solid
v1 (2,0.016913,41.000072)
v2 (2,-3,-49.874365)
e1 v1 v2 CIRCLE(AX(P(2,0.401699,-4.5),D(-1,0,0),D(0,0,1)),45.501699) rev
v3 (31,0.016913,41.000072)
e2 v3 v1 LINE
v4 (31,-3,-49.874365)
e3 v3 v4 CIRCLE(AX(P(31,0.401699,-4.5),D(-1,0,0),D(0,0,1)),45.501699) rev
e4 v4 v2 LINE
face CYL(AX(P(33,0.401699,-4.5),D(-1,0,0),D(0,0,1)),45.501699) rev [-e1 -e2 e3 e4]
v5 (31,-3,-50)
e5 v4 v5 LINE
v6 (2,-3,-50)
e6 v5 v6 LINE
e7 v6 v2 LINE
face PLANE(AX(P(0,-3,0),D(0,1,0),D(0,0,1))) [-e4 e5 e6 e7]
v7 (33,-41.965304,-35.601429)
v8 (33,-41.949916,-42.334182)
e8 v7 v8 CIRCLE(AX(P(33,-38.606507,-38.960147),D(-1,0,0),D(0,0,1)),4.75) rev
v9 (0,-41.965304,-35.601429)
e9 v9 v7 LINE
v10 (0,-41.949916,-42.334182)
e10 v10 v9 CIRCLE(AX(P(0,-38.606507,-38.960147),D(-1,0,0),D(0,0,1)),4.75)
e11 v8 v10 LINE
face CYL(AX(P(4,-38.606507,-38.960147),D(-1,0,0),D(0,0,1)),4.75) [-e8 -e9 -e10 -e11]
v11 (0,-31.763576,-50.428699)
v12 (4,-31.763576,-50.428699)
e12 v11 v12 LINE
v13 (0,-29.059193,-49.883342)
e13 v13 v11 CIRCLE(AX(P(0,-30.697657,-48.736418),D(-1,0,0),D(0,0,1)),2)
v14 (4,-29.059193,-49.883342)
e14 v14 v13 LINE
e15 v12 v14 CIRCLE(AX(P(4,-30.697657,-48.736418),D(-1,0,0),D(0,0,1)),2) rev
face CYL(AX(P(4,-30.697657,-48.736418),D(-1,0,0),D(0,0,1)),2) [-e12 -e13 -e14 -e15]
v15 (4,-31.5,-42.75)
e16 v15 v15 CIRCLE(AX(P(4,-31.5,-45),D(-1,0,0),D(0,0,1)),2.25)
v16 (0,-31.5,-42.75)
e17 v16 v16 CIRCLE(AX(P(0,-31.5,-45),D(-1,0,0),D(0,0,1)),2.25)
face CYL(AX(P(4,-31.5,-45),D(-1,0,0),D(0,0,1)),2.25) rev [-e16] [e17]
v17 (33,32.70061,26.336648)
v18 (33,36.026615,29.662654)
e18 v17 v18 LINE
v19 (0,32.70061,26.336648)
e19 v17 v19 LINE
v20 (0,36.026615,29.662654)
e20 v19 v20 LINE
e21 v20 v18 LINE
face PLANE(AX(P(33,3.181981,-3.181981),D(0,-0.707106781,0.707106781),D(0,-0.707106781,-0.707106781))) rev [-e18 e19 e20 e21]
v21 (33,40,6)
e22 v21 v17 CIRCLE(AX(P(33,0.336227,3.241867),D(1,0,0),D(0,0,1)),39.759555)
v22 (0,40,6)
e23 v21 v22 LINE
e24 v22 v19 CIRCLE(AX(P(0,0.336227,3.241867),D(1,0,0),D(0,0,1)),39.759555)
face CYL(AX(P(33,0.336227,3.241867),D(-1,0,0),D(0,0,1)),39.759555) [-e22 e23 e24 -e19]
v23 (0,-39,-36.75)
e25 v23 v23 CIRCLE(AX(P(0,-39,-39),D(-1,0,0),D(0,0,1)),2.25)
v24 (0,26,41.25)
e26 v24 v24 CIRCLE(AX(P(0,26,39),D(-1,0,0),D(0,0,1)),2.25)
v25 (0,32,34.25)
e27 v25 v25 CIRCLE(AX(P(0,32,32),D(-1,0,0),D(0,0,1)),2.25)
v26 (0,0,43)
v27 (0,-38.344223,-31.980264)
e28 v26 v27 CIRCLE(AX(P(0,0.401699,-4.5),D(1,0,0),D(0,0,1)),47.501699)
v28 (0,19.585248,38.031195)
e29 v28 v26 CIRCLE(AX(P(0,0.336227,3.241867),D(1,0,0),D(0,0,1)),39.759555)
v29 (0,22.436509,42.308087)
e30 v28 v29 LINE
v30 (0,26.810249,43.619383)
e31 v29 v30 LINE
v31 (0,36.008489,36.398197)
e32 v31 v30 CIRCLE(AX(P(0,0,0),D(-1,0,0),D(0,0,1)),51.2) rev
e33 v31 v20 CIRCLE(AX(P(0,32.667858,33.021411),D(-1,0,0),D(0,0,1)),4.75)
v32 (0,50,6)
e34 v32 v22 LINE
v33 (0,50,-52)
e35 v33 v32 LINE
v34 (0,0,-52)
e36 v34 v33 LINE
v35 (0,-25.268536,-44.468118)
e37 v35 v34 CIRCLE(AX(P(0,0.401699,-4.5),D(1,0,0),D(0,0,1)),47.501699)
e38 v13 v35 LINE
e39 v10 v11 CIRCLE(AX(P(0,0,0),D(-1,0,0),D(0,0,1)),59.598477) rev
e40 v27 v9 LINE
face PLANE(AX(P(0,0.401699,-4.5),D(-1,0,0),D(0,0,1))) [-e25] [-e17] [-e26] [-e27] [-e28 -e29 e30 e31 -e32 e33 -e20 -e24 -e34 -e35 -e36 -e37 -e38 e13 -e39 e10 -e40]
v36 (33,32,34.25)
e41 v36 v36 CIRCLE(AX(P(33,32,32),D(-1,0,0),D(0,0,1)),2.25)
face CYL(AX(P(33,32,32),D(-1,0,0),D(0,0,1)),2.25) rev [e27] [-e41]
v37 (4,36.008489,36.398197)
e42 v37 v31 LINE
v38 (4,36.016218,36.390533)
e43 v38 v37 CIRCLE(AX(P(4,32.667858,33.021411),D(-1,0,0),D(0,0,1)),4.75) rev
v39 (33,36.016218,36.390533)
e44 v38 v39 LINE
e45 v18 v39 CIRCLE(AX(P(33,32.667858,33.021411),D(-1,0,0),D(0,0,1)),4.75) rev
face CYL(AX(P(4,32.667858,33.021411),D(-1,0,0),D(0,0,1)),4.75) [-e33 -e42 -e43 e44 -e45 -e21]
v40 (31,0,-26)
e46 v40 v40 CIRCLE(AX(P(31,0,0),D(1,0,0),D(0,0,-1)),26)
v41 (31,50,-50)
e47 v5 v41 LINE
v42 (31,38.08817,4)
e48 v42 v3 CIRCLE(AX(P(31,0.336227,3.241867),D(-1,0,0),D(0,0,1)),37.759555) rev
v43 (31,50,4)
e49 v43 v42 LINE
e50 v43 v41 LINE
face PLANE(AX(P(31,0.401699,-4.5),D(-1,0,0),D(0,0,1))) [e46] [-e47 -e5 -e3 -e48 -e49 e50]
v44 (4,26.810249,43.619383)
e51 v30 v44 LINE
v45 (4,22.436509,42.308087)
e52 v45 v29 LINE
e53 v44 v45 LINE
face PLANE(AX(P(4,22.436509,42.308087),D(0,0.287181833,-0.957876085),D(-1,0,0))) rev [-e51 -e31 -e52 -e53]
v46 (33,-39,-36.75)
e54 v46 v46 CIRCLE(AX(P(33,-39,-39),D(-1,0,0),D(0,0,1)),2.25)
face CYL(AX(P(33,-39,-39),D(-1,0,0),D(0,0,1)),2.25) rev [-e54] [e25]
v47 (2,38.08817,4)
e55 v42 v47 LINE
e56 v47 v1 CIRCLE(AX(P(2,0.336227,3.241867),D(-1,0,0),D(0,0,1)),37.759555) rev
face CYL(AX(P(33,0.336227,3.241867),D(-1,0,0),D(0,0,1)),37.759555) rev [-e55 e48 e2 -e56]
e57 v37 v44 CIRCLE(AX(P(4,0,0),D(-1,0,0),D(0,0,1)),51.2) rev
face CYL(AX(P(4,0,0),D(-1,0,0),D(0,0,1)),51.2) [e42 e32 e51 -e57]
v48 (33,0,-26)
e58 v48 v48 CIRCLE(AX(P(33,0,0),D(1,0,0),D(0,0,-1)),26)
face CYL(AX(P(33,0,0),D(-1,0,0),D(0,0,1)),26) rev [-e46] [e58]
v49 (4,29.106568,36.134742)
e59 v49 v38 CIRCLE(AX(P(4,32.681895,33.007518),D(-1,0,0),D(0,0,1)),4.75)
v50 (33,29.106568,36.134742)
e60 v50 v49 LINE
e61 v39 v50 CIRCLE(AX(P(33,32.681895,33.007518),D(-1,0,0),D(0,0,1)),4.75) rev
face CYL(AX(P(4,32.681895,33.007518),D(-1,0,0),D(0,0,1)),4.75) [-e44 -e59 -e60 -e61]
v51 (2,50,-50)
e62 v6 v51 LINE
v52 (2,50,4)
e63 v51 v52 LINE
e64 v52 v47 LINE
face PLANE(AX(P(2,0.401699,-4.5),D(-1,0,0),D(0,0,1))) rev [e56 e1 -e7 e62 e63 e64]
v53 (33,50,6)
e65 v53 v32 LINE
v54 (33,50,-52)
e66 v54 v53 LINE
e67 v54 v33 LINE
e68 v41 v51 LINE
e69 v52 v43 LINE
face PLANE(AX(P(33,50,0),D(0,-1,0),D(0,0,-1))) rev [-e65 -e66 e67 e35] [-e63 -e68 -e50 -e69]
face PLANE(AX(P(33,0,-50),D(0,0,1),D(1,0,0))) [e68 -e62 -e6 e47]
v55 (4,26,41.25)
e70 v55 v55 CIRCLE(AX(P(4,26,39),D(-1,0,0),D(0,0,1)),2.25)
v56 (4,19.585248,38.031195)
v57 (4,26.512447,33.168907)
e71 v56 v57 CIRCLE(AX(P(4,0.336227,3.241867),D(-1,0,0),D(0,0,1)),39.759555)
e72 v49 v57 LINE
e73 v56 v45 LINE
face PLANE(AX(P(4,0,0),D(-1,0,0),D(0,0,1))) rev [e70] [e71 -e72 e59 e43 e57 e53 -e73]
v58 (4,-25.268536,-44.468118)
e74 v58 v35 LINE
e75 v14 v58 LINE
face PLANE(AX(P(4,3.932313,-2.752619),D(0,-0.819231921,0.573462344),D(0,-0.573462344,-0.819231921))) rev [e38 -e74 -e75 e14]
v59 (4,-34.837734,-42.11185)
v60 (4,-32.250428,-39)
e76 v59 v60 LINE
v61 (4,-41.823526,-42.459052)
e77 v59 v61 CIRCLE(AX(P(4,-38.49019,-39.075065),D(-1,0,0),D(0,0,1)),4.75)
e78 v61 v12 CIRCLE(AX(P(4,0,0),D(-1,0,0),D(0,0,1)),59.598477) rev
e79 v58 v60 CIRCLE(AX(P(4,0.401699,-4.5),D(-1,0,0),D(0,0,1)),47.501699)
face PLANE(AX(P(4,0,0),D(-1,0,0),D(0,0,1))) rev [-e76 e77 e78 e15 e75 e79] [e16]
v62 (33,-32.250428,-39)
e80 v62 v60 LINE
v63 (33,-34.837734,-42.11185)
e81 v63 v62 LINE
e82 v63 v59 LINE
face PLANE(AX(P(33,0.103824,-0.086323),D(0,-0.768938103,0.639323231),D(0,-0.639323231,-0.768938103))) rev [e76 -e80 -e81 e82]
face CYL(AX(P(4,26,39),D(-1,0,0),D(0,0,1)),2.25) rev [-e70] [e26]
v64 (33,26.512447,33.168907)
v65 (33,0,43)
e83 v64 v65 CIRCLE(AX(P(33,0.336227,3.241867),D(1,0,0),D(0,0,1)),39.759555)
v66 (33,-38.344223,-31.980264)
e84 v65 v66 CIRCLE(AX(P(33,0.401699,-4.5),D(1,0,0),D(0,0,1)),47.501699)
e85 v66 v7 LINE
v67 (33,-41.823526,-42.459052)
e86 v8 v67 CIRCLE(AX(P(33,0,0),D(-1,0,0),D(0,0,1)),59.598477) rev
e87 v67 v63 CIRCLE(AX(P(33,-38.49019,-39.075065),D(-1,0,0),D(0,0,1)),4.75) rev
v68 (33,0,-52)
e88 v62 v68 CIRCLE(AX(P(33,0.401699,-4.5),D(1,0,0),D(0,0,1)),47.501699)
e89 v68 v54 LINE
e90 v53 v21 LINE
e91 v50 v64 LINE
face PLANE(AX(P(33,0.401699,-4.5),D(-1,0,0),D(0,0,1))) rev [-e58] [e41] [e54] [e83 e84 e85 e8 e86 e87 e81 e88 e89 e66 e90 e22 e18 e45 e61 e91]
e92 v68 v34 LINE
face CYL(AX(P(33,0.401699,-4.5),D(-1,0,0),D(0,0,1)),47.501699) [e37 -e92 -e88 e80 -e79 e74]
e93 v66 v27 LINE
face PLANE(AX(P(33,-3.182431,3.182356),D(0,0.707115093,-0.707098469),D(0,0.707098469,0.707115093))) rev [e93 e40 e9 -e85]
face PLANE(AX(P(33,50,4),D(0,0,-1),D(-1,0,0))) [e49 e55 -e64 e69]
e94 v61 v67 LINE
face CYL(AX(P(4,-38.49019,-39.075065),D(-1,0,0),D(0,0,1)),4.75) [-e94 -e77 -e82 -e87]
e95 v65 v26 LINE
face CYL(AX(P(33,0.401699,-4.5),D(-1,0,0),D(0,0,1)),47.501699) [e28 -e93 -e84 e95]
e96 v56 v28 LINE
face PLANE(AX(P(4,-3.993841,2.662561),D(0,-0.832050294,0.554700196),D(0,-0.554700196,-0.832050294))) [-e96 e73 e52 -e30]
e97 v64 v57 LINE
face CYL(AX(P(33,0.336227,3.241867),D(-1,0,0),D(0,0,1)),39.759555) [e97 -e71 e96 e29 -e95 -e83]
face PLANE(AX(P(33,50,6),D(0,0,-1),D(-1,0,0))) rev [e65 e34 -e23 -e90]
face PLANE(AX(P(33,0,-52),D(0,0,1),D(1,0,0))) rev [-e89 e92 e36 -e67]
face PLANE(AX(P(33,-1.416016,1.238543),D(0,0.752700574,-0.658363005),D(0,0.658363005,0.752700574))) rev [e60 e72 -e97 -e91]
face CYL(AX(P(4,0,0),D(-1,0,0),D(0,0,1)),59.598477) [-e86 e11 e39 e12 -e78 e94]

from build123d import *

# Parameters (mm, degrees)
SKETCH1_R               = 26
BOSS_EXTRUDE1_DEPTH     = 33
SHELL1_START            = 2
SHELL1_OUTLINE_R        = 28
SHELL1_DEPTH            = 29
SKETCH2_W               = 29
SKETCH2_H               = 54
CUT_EXTRUDE1_DEPTH      = 53
SKETCH3_R               = 26
BOSS_EXTRUDE2_DEPTH     = 2
SKETCH4_R               = 31.708367963
CUT_EXTRUDE2_DEPTH      = 29
SKETCH5_R               = 2.25
BOSS_EXTRUDE3_DEPTH     = 4
FILLET1_R               = 2
CHAMFER1_SIZE           = 3.326511139
BOSS_EXTRUDE4_START     = -33
BOSS_EXTRUDE4_OUTLINE_R = 2.25
BOSS_EXTRUDE4_DEPTH     = 33
FILLET2_R               = 4.75


with BuildPart() as part:
    # Sketch1 → Boss-Extrude1 (new body)
    with BuildSketch(Plane(origin=(0, 0, 0), x_dir=(0, 0, -1), z_dir=(1, 0, 0))):
        with BuildLine():
            Line((52, 0), (52, 50))
            Line((52, 50), (0, 50))
            Line((0, 50), (-6, 50))
            Line((-6, 50), (-6, 40))
            ThreePointArc((-6, 40), (-32.429333818, 27.334633781), (-43, 0))
            ThreePointArc((-43, 0), (4.5, -47.1), (52, 0))
        make_face()
        Circle(SKETCH1_R, mode=Mode.SUBTRACT)
    extrude(amount=BOSS_EXTRUDE1_DEPTH)

    # Shell1: read off the stored shape, not the designer's step
    # Shell1 outline → Shell1 (cut)
    with BuildSketch(Plane.YZ.offset(SHELL1_START)):
        with BuildLine():
            ThreePointArc((0.016913017, 41.000071514), (-45.099999808, -4.495817139), (0.0085476, -50))
            Line((0.0085476, -50), (48, -50))
            Line((48, -50), (48, 4))
            Line((48, 4), (38.088170021, 4))
            ThreePointArc((38.088170021, 4), (26.652605024, 30.320127965), (0.016913017, 41.000071514))
        make_face()
        Circle(SHELL1_OUTLINE_R, mode=Mode.SUBTRACT)
    extrude(amount=SHELL1_DEPTH, mode=Mode.SUBTRACT)

    # Sketch2 → Cut-Extrude1 (cut)
    with BuildSketch(Plane(origin=(0, 50, 0), x_dir=(1, 0, 0), z_dir=(0, 1, 0))):
        with Locations((16.5, 23)):
            Rectangle(SKETCH2_W, SKETCH2_H)
    extrude(amount=-CUT_EXTRUDE1_DEPTH, mode=Mode.SUBTRACT)

    # Sketch3 → Boss-Extrude2 (add)
    with BuildSketch(Plane.ZY):
        with Locations(Location((0, 0, 0), (0, 0, 81.150116902))):
            Circle(SKETCH3_R)
    extrude(amount=-BOSS_EXTRUDE2_DEPTH)

    # Sketch4 → Cut-Extrude2 (cut)
    with BuildSketch(Plane(origin=(31, 0, 0), x_dir=(0, 0, -1), z_dir=(1, 0, 0))):
        Circle(SKETCH4_R)
    extrude(amount=-CUT_EXTRUDE2_DEPTH, mode=Mode.SUBTRACT)

    # Sketch5 → Boss-Extrude3 (add)
    # profile 1 of 2: a face of its own
    with BuildSketch(Plane.ZY):
        with BuildLine():
            ThreePointArc((-51.418984108, -30.13414218), (-48.82497471, -34.177482297), (-45.913745602, -37.998768617))
            Line((-45.913745602, -37.998768617), (-38.477731669, -32.793558864))
            ThreePointArc((-38.477731669, -32.793558864), (-41.663875667, -29.183056126), (-44.468117742, -25.268535724))
            Line((-44.468117742, -25.268535724), (-51.418984108, -30.13414218))
        make_face()
        with Locations((-45, -31.5)):
            Circle(SKETCH5_R, mode=Mode.SUBTRACT)
    # profile 2 of 2: a face of its own
    with BuildSketch(Plane.ZY):
        with BuildLine():
            ThreePointArc((32.398527193, 27.367900169), (35.450790949, 23.647327492), (38.031195395, 19.585248223))
            Line((38.031195395, 19.585248223), (45.075911525, 24.281725643))
            ThreePointArc((45.075911525, 24.281725643), (42.60097507, 28.400650047), (39.750789641, 32.269408468))
            Line((39.750789641, 32.269408468), (32.398527193, 27.367900169))
        make_face()
        with Locations((39, 26)):
            Circle(SKETCH5_R, mode=Mode.SUBTRACT)
    extrude(amount=-BOSS_EXTRUDE3_DEPTH)

    # Fillet1
    fillet1_edges = [part.edges().sort_by_distance(p)[0] for p in [
        (2, -30.13414218, -51.418984108),
    ]]
    fillet(fillet1_edges, radius=FILLET1_R)

    # Chamfer1
    # the kernel refuses this chamfer: 3.326511139, 3 mm, written as the material it takes off along each edge
    with BuildSketch(Plane(origin=(-8.575137871, 24.281725643, 45.075911525), x_dir=(0, -0.5547001962252163, -0.8320502943378523), z_dir=(1, 0, 0))) as chamfer1_piece_1:
        with BuildLine():
            Line((CHAMFER1_SIZE, 0), (-0.190667191, 2.911795765))
            ThreePointArc((-0.190667191, 2.911795765), (-0.119044869, 1.500102705), (0, 0))
            Line((0, 0), (CHAMFER1_SIZE, 0))
        make_face()
    extrude(amount=21.150275743, mode=Mode.SUBTRACT)

    # Boss-Extrude4: read off the stored shape, not the designer's step
    # Boss-Extrude4 outline → Boss-Extrude4 (add)
    # profile 1 of 2: a face of its own
    with BuildSketch(Plane.ZY.offset(BOSS_EXTRUDE4_START)):
        with BuildLine():
            ThreePointArc((26.336648486, 32.700609517), (29.932721568, 29.805201706), (33.168906621, 26.512446886))
            Line((33.168906621, 26.512446886), (39.750789641, 32.269408468))
            ThreePointArc((39.750789641, 32.269408468), (36.48342014, 35.922138784), (32.881782461, 39.245743491))
            Line((32.881782461, 39.245743491), (26.336648486, 32.700609517))
        make_face()
        with Locations((32, 32)):
            Circle(BOSS_EXTRUDE4_OUTLINE_R, mode=Mode.SUBTRACT)
    # profile 2 of 2: a face of its own
    with BuildSketch(Plane.ZY.offset(BOSS_EXTRUDE4_START)):
        with BuildLine():
            Line((-38.840294261, -45.204092661), (-31.980263742, -38.344223418))
            ThreePointArc((-31.980263742, -38.344223418), (-35.639554577, -35.469452882), (-39, -32.250427936))
            Line((-39, -32.250427936), (-45.913745602, -37.998768617))
            ThreePointArc((-45.913745602, -37.998768617), (-42.529883516, -41.751496496), (-38.840294261, -45.204092661))
        make_face()
        with Locations((-39, -39)):
            Circle(BOSS_EXTRUDE4_OUTLINE_R, mode=Mode.SUBTRACT)
    extrude(amount=BOSS_EXTRUDE4_DEPTH)

    # Fillet2
    # the kernel refuses this fillet: 4.75 mm, written as the material it takes off along each edge
    with BuildSketch(Plane(origin=(45.884989722, -37.998768617, -45.913745602), x_dir=(0, -0.742095530004095, 0.6702941327118576), z_dir=(-1, 0, 0))) as fillet2_piece_1:
        with BuildLine():
            CenterArc((4.948609093, 4.745557529), FILLET2_R, 177.651602882, 94.826600607)
            Line((0.202598429, 4.940192516), (0, 0))
            ThreePointArc((0, 0), (2.576997944, -0.055739892), (5.153995889, 0))
        make_face()
    extrude(amount=41.884989722, mode=Mode.SUBTRACT)
    with BuildSketch(Plane(origin=(44.936529157, -45.204092661, -38.840294261), x_dir=(0, 0.6815583401392785, -0.7317637794989523), z_dir=(-1, 0, 0))) as fillet2_piece_2:
        with BuildLine():
            CenterArc((4.584343333, -4.746187729), FILLET2_R, 87.70431796, 90.260546116)
            Line((-0.162660545, -4.577504047), (0, 0))
            ThreePointArc((0, 0), (2.387305831, 0.047832742), (4.774611663, 0))
        make_face()
    extrude(amount=56.873058314, mode=Mode.SUBTRACT)
    with BuildSketch(Plane(origin=(44.949107529, 39.245743491, 32.881782461), x_dir=(0, -0.6773005061883329, 0.735706479730217), z_dir=(-1, 0, 0))) as fillet2_piece_3:
        with BuildLine():
            CenterArc((4.557931056, -4.744822843), FILLET2_R, 87.324678627, 90.308374896)
            Line((-0.188016347, -4.548651358), (0, 0))
            ThreePointArc((0, 0), (2.389821506, 0.055804306), (4.779643012, 0))
        make_face()
    extrude(amount=56.898215059, mode=Mode.SUBTRACT)
    with BuildSketch(Plane(origin=(45.609389119, 32.269408468, 39.750789641), x_dir=(0, -0.6583630051662173, -0.7527005735539911), z_dir=(-1, 0, 0))) as fillet2_piece_4:
        with BuildLine():
            CenterArc((4.804098652, -4.75), FILLET2_R, 90, 93.540841906)
            ThreePointArc((0.06316627, -5.043360096), (-0.030557791, -2.522458341), (0, 0))
            Line((0, 0), (4.804098652, 0))
        make_face()
    extrude(amount=41.609389119, mode=Mode.SUBTRACT)


solid = part.part
